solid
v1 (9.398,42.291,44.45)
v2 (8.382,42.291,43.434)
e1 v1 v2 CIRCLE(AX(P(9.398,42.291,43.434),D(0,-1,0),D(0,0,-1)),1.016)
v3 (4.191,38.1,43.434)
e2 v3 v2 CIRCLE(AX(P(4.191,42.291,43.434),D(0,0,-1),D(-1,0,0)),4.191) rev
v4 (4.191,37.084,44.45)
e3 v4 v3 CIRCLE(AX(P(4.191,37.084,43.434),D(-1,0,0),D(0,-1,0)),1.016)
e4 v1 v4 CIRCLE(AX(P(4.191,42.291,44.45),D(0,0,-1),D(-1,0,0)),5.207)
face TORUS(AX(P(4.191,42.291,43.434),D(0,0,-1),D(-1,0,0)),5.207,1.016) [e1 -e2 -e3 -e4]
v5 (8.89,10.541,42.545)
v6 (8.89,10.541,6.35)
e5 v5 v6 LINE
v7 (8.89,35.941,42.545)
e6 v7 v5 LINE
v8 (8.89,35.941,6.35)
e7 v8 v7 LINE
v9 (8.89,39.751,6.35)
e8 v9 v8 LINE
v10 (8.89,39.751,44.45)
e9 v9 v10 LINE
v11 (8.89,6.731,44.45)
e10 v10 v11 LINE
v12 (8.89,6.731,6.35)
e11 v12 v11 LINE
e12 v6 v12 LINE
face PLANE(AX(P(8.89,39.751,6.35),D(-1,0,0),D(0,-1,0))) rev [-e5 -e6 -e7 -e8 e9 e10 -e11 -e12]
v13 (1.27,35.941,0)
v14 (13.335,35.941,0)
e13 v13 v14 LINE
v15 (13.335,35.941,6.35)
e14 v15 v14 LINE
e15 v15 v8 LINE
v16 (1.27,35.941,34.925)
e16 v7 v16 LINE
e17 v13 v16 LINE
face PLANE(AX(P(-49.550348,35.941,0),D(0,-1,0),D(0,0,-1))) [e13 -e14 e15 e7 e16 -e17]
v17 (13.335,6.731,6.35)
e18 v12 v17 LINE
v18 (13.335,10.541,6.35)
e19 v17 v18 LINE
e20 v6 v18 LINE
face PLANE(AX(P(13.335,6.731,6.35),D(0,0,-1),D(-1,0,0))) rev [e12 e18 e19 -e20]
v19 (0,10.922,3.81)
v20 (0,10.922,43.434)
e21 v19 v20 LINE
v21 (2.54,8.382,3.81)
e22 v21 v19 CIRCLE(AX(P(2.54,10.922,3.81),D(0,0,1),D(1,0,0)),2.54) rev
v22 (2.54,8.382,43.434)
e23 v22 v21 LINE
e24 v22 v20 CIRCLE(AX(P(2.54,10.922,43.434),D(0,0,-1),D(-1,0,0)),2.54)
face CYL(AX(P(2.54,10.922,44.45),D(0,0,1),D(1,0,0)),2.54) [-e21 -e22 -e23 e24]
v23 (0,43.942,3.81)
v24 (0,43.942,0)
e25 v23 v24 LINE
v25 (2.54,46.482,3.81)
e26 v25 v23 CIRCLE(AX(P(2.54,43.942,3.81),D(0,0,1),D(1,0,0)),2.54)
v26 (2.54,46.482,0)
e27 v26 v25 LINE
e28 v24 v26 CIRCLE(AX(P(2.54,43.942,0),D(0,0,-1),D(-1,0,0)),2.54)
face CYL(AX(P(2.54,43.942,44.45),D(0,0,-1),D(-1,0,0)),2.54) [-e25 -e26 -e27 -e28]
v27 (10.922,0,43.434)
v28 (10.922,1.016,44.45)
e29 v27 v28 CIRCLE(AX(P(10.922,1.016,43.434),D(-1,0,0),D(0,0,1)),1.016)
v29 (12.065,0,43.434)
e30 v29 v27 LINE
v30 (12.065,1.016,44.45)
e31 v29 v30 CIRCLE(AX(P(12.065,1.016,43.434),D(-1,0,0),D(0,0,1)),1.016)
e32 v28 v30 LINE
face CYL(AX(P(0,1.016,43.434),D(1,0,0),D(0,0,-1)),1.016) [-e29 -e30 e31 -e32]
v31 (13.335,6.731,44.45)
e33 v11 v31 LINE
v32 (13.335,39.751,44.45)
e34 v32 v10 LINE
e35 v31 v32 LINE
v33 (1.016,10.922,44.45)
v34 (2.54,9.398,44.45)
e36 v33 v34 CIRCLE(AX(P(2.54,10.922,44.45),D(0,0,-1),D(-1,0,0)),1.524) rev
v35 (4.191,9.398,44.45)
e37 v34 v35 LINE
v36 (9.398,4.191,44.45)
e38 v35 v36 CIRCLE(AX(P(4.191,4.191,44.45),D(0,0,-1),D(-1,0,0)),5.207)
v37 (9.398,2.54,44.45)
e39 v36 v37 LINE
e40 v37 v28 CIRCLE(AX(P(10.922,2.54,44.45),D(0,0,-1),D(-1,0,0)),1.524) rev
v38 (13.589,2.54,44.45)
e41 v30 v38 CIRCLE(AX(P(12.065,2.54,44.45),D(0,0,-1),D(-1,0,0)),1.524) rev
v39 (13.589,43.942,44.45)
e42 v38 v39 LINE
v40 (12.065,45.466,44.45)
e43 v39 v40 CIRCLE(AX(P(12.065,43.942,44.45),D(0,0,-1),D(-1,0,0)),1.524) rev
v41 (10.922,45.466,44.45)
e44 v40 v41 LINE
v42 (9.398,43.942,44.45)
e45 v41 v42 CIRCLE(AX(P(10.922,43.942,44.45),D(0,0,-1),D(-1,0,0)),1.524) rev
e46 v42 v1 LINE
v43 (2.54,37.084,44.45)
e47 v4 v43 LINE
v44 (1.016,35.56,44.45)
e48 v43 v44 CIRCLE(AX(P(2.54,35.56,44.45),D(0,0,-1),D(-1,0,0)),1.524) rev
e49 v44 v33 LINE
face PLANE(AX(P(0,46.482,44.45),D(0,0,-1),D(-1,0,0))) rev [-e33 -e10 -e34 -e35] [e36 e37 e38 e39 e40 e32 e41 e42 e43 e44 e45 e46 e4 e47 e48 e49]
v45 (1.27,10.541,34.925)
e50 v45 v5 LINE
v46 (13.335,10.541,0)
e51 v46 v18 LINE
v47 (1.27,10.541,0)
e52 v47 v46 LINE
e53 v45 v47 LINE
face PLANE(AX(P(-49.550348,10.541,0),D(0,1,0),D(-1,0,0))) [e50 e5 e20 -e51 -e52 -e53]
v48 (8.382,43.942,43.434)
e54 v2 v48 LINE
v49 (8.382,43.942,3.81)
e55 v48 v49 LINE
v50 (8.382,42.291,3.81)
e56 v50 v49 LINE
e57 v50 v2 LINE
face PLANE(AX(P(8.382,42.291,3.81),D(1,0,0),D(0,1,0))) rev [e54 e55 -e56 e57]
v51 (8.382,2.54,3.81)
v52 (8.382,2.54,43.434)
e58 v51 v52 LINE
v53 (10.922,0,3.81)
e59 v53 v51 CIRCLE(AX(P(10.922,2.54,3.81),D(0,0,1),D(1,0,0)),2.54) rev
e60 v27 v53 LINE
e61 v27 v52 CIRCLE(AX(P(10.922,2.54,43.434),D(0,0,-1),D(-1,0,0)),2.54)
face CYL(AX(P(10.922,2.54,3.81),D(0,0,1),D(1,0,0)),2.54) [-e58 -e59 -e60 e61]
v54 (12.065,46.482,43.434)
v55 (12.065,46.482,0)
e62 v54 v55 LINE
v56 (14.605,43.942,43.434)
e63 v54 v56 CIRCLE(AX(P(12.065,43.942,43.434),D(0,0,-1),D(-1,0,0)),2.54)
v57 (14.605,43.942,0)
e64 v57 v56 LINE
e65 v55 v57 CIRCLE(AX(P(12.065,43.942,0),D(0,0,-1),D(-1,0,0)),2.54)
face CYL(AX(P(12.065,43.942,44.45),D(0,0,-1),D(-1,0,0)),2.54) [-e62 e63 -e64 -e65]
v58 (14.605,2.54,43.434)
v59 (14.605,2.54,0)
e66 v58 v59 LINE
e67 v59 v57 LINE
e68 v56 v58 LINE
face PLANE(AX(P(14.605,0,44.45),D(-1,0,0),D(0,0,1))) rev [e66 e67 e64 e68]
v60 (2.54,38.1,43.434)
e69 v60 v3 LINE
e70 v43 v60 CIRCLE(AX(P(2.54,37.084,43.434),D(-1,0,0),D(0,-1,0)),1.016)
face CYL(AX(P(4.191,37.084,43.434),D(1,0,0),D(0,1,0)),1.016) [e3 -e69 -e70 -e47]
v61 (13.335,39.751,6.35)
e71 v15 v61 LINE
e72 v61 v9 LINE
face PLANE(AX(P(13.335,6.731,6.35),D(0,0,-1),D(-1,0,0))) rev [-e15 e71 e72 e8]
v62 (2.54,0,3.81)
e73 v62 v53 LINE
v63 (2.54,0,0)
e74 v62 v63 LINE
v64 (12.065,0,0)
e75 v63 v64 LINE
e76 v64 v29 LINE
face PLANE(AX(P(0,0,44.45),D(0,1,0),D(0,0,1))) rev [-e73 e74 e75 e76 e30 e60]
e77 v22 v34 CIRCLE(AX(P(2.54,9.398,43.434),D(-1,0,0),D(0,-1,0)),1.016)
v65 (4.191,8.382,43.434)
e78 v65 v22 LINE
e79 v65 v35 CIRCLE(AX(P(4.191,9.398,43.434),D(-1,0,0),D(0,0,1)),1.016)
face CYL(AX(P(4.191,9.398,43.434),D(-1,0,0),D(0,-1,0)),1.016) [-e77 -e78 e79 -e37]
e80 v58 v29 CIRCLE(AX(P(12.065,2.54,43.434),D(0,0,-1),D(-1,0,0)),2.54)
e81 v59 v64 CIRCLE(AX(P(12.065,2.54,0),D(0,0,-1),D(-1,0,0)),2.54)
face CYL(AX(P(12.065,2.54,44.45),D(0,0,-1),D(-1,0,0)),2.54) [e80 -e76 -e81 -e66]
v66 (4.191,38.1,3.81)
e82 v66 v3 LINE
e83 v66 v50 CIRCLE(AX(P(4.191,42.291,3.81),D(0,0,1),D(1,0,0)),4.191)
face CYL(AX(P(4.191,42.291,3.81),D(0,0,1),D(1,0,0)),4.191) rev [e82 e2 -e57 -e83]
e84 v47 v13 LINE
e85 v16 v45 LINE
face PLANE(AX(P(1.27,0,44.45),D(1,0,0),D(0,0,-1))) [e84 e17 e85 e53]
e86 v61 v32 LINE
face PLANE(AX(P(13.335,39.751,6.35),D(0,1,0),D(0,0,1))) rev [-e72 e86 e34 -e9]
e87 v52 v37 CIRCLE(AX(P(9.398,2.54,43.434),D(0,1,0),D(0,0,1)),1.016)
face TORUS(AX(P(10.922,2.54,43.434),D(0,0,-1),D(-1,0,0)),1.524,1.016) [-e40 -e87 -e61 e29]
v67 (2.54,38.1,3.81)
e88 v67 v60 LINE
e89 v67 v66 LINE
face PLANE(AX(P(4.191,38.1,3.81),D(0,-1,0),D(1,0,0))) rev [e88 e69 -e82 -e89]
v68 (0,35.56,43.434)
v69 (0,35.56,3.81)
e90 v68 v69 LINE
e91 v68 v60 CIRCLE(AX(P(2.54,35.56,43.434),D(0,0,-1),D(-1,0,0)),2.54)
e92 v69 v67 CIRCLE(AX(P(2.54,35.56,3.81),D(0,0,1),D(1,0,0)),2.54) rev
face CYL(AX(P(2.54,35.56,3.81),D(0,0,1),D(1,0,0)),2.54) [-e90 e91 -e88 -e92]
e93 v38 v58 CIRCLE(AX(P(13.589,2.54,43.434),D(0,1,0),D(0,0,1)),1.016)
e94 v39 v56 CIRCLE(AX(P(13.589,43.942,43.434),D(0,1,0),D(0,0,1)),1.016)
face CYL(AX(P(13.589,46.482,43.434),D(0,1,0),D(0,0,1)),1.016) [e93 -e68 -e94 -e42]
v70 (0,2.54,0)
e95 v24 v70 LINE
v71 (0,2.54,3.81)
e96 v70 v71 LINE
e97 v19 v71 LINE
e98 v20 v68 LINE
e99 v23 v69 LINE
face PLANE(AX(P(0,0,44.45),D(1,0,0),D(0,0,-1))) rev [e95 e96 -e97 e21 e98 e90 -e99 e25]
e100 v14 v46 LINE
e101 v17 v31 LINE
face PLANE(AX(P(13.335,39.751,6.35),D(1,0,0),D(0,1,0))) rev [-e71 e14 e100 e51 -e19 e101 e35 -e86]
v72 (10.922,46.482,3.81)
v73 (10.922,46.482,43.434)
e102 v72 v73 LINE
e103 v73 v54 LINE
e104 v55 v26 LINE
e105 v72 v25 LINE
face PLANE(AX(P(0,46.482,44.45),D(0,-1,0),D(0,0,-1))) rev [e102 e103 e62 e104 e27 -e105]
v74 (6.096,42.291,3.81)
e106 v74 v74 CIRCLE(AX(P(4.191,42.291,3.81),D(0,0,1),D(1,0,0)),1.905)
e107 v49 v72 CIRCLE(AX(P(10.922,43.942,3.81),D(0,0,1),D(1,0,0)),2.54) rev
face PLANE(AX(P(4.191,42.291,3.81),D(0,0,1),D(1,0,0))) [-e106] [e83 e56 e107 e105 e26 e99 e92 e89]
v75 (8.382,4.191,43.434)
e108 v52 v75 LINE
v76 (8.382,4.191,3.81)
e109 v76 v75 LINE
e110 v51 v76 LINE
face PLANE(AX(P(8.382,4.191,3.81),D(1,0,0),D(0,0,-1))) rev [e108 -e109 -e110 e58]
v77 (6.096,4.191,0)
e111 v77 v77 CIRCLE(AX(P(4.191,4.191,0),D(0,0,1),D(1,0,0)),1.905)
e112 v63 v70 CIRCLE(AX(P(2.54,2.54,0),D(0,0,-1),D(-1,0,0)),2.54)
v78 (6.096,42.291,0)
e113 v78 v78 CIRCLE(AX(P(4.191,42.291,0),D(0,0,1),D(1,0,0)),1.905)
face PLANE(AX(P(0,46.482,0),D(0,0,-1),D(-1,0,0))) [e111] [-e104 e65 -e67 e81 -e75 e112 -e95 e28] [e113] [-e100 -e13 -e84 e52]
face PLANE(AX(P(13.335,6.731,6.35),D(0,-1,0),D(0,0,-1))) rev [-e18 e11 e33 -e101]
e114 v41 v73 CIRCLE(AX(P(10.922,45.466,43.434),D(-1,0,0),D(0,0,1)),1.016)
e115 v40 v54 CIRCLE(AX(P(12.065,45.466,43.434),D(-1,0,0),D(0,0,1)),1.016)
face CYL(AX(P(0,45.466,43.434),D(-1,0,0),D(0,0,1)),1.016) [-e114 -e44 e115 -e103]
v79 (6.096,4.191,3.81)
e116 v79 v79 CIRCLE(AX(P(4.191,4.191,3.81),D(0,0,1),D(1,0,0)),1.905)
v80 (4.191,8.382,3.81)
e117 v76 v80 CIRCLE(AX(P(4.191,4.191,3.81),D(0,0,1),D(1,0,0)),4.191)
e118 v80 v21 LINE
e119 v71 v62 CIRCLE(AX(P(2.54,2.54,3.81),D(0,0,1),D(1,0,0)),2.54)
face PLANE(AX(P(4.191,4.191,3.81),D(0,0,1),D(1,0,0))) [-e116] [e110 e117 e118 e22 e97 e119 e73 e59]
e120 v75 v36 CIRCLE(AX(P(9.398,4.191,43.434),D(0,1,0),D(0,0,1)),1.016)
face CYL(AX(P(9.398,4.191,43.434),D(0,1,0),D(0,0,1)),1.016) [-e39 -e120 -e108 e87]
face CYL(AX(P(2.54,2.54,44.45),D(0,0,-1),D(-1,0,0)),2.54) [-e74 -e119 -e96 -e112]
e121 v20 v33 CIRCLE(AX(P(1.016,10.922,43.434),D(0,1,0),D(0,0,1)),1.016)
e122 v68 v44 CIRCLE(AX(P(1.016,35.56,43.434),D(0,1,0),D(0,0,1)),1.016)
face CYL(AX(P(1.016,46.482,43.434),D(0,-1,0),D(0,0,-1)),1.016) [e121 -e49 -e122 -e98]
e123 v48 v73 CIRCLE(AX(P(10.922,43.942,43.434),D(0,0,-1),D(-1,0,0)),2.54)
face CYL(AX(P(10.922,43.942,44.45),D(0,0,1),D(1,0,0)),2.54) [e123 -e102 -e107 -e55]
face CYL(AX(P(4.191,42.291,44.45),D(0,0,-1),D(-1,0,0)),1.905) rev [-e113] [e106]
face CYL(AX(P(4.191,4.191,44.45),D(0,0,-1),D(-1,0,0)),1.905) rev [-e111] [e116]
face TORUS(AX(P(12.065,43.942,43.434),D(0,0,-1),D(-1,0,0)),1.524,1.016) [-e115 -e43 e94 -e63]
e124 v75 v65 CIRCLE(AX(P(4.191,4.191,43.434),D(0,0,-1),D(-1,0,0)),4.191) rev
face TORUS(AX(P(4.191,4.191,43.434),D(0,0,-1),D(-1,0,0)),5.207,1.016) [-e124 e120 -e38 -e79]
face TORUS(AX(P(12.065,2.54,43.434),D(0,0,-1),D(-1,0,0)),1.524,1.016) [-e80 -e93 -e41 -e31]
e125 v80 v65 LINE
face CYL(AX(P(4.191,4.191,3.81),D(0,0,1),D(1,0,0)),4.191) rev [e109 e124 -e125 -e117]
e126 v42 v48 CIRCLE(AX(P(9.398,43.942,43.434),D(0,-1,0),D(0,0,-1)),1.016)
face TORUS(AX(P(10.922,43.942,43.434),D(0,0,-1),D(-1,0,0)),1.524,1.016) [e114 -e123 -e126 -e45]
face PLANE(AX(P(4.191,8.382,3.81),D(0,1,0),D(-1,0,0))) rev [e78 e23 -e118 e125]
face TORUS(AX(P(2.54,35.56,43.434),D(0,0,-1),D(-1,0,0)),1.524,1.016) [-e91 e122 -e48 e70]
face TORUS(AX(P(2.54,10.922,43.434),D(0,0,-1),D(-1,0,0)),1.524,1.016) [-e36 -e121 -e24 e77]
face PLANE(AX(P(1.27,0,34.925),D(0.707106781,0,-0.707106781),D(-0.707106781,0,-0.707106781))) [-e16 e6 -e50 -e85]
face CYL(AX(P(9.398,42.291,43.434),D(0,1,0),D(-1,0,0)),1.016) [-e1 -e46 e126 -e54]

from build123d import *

# Parameters (mm, degrees)
SKETCH1_W           = 14.605
SKETCH1_H           = 46.482
SKETCH1_R           = 1.905
BOSS_EXTRUDE1_DEPTH = 44.45
SKETCH2_W           = 4.445
SKETCH2_H           = 33.02
CUT_EXTRUDE1_DEPTH  = 38.1
SKETCH3_W           = 42.545
SKETCH3_H           = 25.4
CUT_EXTRUDE2_DEPTH  = 12.065
CUT_EXTRUDE3_DEPTH  = 40.64
FILLET1_R           = 2.54
FILLET2_R           = 1.016
CHAMFER1_SIZE       = 7.62


with BuildPart() as part:
    # Sketch1 → Boss-Extrude1 (new body)
    with BuildSketch(Plane.XY):
        with Locations((7.3025, 23.241)):
            Rectangle(SKETCH1_W, SKETCH1_H)
        with Locations((4.191, 42.291)):
            Circle(SKETCH1_R, mode=Mode.SUBTRACT)
        with Locations((4.191, 4.191)):
            Circle(SKETCH1_R, mode=Mode.SUBTRACT)
    extrude(amount=BOSS_EXTRUDE1_DEPTH)

    # Sketch2 → Cut-Extrude1 (cut)
    with BuildSketch(Plane.XY.offset(44.45)):
        with Locations((11.1125, 23.241)):
            Rectangle(SKETCH2_W, SKETCH2_H)
    extrude(amount=-CUT_EXTRUDE1_DEPTH, mode=Mode.SUBTRACT)

    # Sketch3 → Cut-Extrude2 (cut)
    with BuildSketch(Plane.ZY.offset(-13.335)):
        with Locations((21.2725, 23.241)):
            Rectangle(SKETCH3_W, SKETCH3_H)
    extrude(amount=CUT_EXTRUDE2_DEPTH, mode=Mode.SUBTRACT)

    # Sketch4 → Cut-Extrude3 (cut)
    with BuildSketch(Plane.XY.offset(44.45)):
        with BuildLine():
            Line((4.191, 38.1), (0, 38.1))
            Line((0, 38.1), (0, 46.482))
            Line((0, 46.482), (8.382, 46.482))
            Line((8.382, 46.482), (8.382, 42.291))
            ThreePointArc((8.382, 42.291), (7.15448452, 39.32751548), (4.191, 38.1))
        make_face()
        with BuildLine():
            Line((4.191, 8.382), (0, 8.382))
            Line((0, 8.382), (0, 0))
            Line((0, 0), (8.382, 0))
            Line((8.382, 0), (8.382, 4.191))
            ThreePointArc((8.382, 4.191), (7.15448452, 7.15448452), (4.191, 8.382))
        make_face()
    extrude(amount=-CUT_EXTRUDE3_DEPTH, mode=Mode.SUBTRACT)

    # Fillet1
    fillet1_edges = [part.edges().sort_by_distance(p)[0] for p in [
        (0, 46.482, 1.905),
        (8.382, 46.482, 24.13),
        (0, 38.1, 24.13),
        (14.605, 46.482, 22.225),
        (0, 0, 1.905),
        (14.605, 0, 22.225),
        (8.382, 0, 24.13),
        (0, 8.382, 24.13),
    ]]
    fillet(fillet1_edges, radius=FILLET1_R)

    # Fillet2
    fillet2_edges = [part.edges().sort_by_distance(p)[0] for p in [
        (3.3655, 38.1, 44.45),
        (0, 23.241, 44.45),
        (13.861051224, 45.738051224, 44.45),
        (13.861051224, 0.743948776, 44.45),
        (9.125948776, 0.743948776, 44.45),
        (0.743948776, 9.125948776, 44.45),
        (0.743948776, 37.356051224, 44.45),
        (9.125948776, 45.738051224, 44.45),
        (7.15448452, 39.32751548, 44.45),
        (8.382, 43.1165, 44.45),
        (7.15448452, 7.15448452, 44.45),
        (3.3655, 8.382, 44.45),
        (11.4935, 46.482, 44.45),
        (8.382, 3.3655, 44.45),
        (11.4935, 0, 44.45),
        (14.605, 23.241, 44.45),
    ]]
    fillet(fillet2_edges, radius=FILLET2_R)

    # Chamfer1
    chamfer1_edges = [part.edges().sort_by_distance(p)[0] for p in [
        (1.27, 23.241, 42.545),
    ]]
    chamfer(chamfer1_edges, length=CHAMFER1_SIZE - 0.0001)  # a hair under: the kernel refuses the full size


solid = part.part
